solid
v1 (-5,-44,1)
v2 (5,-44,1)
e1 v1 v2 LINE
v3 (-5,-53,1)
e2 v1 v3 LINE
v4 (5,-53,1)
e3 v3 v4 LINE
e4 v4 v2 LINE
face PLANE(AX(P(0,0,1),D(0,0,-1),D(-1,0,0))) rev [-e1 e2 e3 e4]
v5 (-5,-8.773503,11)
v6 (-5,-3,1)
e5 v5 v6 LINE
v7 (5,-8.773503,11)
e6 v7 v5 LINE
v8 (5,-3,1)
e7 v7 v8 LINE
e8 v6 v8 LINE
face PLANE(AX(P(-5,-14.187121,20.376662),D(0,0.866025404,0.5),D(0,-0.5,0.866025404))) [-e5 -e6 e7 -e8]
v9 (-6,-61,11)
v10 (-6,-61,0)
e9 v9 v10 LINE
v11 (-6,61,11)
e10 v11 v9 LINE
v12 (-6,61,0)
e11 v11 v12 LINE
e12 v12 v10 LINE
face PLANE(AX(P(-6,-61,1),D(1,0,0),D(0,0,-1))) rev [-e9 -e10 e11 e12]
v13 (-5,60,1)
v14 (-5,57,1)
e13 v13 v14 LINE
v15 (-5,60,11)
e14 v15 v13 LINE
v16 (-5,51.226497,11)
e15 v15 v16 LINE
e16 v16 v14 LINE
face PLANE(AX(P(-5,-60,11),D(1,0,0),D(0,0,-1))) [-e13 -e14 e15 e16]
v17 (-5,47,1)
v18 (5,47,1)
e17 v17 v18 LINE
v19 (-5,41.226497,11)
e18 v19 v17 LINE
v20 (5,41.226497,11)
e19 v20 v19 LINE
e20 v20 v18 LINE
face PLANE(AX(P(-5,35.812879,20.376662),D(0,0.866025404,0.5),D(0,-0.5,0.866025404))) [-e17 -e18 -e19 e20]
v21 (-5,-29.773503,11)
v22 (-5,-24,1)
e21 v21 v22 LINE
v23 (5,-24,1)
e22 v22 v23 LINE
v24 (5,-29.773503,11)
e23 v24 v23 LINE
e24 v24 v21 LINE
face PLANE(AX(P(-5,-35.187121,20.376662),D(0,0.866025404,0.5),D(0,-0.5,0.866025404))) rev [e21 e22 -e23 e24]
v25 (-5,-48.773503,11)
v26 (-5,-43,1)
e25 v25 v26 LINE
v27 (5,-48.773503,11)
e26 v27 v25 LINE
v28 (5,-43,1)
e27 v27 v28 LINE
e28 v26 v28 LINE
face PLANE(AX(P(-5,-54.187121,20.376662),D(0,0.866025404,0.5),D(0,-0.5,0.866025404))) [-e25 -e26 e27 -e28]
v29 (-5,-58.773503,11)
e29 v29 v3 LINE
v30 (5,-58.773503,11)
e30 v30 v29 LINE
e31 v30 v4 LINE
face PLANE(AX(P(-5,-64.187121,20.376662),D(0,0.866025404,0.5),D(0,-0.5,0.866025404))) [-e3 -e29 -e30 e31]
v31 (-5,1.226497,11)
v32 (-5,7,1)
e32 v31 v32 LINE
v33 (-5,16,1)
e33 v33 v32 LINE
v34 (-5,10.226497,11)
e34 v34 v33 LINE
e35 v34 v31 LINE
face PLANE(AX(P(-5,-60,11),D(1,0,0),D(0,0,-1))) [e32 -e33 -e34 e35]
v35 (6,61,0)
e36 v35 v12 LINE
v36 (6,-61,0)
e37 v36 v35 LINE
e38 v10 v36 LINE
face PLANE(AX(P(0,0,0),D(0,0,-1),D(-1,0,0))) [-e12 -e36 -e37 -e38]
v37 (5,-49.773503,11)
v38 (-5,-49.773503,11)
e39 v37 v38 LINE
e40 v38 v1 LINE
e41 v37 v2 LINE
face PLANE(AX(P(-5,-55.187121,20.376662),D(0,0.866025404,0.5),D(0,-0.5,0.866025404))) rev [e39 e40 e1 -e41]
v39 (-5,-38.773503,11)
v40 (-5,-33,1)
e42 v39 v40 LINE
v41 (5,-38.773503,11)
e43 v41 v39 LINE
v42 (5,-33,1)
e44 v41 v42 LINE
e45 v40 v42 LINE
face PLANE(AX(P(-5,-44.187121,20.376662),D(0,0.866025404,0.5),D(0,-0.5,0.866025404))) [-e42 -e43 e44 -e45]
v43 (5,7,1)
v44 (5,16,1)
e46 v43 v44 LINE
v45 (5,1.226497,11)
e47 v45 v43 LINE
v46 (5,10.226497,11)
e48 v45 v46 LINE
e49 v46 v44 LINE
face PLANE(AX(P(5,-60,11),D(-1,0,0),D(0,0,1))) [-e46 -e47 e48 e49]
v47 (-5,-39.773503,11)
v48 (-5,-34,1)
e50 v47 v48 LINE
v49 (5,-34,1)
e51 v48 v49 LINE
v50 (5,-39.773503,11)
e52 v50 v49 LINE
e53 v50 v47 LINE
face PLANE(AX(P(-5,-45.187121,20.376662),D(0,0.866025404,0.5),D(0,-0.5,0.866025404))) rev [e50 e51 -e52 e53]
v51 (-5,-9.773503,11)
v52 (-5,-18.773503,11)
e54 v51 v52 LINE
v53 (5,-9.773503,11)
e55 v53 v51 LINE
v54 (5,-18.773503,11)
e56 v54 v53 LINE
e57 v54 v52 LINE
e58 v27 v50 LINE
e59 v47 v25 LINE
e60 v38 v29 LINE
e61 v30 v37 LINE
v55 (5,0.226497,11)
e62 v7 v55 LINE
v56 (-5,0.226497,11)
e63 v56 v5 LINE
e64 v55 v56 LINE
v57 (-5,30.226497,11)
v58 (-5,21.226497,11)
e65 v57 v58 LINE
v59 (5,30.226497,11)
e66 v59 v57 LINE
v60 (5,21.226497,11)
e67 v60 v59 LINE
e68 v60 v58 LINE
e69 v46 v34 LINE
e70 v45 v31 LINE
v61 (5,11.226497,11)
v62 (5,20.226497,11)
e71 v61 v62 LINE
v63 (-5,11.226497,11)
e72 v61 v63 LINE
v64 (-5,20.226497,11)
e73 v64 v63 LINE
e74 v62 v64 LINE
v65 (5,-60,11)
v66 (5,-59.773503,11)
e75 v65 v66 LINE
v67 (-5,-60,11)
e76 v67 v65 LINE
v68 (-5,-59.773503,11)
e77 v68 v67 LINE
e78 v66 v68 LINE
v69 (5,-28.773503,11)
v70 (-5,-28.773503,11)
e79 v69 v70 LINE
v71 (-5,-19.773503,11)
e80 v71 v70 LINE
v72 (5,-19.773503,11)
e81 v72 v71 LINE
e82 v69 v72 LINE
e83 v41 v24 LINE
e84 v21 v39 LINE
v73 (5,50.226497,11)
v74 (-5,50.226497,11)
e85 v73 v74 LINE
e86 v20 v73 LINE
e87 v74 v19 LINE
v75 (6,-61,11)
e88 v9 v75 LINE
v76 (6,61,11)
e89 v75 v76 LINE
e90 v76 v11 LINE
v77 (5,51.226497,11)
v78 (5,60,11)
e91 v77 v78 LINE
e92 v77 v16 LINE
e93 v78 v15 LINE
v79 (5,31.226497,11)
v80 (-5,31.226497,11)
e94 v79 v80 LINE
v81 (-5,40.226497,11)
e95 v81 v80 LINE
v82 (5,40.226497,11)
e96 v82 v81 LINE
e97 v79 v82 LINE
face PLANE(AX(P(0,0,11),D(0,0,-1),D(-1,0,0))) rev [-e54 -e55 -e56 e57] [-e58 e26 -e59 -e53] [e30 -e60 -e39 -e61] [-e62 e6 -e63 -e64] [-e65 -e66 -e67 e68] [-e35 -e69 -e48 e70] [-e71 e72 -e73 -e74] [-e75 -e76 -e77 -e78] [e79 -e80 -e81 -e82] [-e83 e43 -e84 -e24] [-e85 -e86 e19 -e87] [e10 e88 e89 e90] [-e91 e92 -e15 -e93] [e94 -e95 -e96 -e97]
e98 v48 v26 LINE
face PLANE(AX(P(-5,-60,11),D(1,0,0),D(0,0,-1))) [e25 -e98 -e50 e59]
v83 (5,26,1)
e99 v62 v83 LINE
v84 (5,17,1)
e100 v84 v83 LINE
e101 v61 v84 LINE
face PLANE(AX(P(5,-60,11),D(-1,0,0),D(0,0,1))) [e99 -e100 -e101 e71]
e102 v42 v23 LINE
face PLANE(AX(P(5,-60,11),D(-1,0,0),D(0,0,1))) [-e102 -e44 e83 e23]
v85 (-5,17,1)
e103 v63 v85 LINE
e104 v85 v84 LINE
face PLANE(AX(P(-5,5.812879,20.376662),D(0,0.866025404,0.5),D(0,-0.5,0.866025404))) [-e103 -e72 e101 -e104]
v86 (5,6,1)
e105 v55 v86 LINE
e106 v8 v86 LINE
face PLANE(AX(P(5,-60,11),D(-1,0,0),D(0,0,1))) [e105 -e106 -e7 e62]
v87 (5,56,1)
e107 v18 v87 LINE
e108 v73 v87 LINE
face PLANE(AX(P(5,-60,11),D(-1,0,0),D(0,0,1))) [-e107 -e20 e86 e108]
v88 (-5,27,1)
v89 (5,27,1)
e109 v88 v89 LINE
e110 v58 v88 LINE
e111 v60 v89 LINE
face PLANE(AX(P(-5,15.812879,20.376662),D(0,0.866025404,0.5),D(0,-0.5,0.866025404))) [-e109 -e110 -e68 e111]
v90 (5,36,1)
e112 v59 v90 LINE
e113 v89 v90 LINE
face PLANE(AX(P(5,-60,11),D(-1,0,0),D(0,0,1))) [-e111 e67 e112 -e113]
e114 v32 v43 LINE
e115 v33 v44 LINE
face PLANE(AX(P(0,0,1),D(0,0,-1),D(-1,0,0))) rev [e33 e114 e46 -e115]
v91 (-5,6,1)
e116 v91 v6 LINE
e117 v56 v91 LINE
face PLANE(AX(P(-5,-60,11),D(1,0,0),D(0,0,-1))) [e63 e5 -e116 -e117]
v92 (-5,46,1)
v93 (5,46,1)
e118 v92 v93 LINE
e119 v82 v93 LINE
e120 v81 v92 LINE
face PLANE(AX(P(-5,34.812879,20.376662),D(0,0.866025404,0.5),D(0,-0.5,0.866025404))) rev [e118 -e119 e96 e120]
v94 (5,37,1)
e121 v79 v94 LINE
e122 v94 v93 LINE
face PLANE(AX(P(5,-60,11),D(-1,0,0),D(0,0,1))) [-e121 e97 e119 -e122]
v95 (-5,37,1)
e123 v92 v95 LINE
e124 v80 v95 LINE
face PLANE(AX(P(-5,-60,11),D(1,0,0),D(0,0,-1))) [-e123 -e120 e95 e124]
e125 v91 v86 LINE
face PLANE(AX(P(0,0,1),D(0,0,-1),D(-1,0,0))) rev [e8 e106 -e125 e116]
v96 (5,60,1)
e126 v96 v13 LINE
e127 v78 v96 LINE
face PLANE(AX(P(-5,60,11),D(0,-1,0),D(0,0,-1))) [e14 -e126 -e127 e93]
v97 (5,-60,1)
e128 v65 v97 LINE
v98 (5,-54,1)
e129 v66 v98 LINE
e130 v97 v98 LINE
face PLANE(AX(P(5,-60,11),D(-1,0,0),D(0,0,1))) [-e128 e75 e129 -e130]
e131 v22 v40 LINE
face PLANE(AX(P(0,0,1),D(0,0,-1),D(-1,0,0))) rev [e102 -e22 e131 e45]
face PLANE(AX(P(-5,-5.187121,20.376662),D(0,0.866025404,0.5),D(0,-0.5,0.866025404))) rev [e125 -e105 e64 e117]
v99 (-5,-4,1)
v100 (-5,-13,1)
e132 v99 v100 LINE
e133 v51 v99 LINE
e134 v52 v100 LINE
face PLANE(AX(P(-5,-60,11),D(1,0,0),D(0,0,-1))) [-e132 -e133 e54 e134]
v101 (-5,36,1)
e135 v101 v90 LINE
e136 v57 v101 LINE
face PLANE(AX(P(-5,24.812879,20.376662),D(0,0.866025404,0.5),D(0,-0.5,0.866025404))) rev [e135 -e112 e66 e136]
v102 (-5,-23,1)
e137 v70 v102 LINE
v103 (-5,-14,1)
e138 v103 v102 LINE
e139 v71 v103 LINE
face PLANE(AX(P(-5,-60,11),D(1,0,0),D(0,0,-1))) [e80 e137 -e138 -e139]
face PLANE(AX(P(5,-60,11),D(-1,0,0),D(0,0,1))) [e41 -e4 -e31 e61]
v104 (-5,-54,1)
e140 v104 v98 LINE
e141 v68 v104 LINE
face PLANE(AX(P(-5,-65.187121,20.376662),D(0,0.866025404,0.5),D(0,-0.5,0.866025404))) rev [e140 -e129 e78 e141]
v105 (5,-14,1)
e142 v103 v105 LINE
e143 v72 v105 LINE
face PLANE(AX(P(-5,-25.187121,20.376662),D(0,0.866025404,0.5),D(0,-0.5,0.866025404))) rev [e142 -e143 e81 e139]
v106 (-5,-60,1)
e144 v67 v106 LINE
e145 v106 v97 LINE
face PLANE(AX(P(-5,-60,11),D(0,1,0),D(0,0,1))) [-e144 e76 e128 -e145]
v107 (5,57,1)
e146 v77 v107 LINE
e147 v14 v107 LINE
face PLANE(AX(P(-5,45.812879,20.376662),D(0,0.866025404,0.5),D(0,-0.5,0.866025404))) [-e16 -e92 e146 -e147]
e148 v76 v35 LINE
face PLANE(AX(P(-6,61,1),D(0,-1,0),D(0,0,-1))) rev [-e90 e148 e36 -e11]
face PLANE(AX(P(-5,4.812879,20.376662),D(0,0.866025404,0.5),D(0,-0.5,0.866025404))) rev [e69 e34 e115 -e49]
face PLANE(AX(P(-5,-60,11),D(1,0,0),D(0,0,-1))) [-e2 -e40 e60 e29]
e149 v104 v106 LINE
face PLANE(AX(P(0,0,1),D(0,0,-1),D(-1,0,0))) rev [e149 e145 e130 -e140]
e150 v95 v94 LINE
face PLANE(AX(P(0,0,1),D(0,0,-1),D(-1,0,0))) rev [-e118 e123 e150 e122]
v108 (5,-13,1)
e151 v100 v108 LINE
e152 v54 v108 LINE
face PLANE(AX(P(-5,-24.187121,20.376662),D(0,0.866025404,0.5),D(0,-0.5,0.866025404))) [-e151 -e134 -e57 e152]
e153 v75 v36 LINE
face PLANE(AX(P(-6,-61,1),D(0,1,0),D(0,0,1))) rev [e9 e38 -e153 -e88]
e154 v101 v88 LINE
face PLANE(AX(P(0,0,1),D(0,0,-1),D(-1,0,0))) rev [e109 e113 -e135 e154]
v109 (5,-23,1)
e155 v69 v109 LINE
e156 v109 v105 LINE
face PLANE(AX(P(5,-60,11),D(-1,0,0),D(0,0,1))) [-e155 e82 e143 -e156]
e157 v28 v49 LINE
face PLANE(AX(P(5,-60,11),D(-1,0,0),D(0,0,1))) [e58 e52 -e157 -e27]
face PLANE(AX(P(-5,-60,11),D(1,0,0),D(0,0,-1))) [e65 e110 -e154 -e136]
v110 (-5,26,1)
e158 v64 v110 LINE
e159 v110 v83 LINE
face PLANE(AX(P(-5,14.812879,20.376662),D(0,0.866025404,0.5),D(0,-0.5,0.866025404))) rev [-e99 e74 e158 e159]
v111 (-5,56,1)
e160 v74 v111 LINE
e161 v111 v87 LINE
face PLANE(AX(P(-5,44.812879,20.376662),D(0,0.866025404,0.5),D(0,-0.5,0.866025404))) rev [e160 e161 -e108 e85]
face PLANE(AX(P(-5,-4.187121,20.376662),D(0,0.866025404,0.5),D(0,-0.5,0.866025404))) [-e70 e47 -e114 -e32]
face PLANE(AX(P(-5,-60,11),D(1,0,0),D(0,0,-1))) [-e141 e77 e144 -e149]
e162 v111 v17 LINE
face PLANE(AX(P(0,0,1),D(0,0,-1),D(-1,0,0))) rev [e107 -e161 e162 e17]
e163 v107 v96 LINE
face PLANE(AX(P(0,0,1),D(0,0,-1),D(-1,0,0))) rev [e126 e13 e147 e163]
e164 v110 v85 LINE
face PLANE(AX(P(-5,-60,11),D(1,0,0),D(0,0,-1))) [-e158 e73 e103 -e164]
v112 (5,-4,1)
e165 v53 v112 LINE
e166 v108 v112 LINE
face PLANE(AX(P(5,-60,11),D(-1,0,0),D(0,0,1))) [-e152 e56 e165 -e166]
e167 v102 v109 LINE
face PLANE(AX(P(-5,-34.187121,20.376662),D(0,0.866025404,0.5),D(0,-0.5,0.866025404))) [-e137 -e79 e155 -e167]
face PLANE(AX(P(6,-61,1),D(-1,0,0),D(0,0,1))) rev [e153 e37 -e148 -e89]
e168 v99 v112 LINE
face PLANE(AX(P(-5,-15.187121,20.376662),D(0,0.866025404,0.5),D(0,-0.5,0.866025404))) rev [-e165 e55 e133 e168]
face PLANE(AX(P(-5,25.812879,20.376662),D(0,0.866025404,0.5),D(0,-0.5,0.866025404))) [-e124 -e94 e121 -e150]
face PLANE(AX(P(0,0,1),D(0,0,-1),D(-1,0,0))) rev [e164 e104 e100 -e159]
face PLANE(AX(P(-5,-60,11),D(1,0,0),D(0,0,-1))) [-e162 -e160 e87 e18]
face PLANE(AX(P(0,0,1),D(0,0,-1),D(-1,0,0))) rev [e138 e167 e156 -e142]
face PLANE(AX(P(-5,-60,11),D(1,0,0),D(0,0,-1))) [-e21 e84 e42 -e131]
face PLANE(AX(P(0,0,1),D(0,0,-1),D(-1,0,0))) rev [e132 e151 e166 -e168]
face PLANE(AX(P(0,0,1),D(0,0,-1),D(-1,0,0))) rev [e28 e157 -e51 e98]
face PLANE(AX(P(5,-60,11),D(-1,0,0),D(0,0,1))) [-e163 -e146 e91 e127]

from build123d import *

# Parameters (mm, degrees)
ESBO_O1_W                = 12
ESBO_O1_H                = 122
RESSALTO_EXTRUS_O1_DEPTH = 1
ESBO_O2_W                = 12
ESBO_O2_H                = 122
ESBO_O2_W_2              = 10
ESBO_O2_H_2              = 120
RESSALTO_EXTRUS_O2_DEPTH = 10
ESBO_O3_W                = 10
ESBO_O3_H                = 1
RESSALTO_EXTRUS_O3_DEPTH = 11.547005384
PADR_O_START             = -5
PADR_O_LINEAR1_DEPTH     = 10


# Read off the part's stored shape, not the designer's step: Padrão linear1
with BuildPart() as part:
    # Esboço1 → Ressalto-extrusão1 (new body)
    with BuildSketch(Plane.XY):
        Rectangle(ESBO_O1_W, ESBO_O1_H)
    extrude(amount=RESSALTO_EXTRUS_O1_DEPTH)

    # Esboço2 → Ressalto-extrusão2 (add)
    with BuildSketch(Plane.XY.offset(1)):
        Rectangle(ESBO_O2_W, ESBO_O2_H)
        Rectangle(ESBO_O2_W_2, ESBO_O2_H_2, mode=Mode.SUBTRACT)
    extrude(amount=RESSALTO_EXTRUS_O2_DEPTH)

    # Esboço3 → Ressalto-extrusão3 (add, along a direction that is not the sketch's normal)
    with BuildSketch(Plane.XY.offset(1)):
        with Locations((0, 56.5)):
            Rectangle(ESBO_O3_W, ESBO_O3_H)
    extrude(amount=RESSALTO_EXTRUS_O3_DEPTH, dir=(0, -0.4999999999999981, 0.8660254037844398))

    # Padrão linear1 outline → Padrão linear1 (add)
    with BuildSketch(Plane.YZ.offset(PADR_O_START)):
        Polygon((-58.773502692, 11), (-59.773502692, 11), (-54, 1), (-53, 1), align=None)
        Polygon((-48.773502692, 11), (-49.773502692, 11), (-44, 1), (-43, 1), align=None)
        Polygon((-38.773502692, 11), (-39.773502692, 11), (-34, 1), (-33, 1), align=None)
        Polygon((-28.773502692, 11), (-29.773502692, 11), (-24, 1), (-23, 1), align=None)
        Polygon((-18.773502692, 11), (-19.773502692, 11), (-14, 1), (-13, 1), align=None)
        Polygon((-8.773502692, 11), (-9.773502692, 11), (-4, 1), (-3, 1), align=None)
        Polygon((1.226497308, 11), (0.226497308, 11), (6, 1), (7, 1), align=None)
        Polygon((11.226497308, 11), (10.226497308, 11), (16, 1), (17, 1), align=None)
        Polygon((21.226497308, 11), (20.226497308, 11), (26, 1), (27, 1), align=None)
        Polygon((31.226497308, 11), (30.226497308, 11), (36, 1), (37, 1), align=None)
        Polygon((41.226497308, 11), (40.226497308, 11), (46, 1), (47, 1), align=None)
    extrude(amount=PADR_O_LINEAR1_DEPTH)


solid = part.part
